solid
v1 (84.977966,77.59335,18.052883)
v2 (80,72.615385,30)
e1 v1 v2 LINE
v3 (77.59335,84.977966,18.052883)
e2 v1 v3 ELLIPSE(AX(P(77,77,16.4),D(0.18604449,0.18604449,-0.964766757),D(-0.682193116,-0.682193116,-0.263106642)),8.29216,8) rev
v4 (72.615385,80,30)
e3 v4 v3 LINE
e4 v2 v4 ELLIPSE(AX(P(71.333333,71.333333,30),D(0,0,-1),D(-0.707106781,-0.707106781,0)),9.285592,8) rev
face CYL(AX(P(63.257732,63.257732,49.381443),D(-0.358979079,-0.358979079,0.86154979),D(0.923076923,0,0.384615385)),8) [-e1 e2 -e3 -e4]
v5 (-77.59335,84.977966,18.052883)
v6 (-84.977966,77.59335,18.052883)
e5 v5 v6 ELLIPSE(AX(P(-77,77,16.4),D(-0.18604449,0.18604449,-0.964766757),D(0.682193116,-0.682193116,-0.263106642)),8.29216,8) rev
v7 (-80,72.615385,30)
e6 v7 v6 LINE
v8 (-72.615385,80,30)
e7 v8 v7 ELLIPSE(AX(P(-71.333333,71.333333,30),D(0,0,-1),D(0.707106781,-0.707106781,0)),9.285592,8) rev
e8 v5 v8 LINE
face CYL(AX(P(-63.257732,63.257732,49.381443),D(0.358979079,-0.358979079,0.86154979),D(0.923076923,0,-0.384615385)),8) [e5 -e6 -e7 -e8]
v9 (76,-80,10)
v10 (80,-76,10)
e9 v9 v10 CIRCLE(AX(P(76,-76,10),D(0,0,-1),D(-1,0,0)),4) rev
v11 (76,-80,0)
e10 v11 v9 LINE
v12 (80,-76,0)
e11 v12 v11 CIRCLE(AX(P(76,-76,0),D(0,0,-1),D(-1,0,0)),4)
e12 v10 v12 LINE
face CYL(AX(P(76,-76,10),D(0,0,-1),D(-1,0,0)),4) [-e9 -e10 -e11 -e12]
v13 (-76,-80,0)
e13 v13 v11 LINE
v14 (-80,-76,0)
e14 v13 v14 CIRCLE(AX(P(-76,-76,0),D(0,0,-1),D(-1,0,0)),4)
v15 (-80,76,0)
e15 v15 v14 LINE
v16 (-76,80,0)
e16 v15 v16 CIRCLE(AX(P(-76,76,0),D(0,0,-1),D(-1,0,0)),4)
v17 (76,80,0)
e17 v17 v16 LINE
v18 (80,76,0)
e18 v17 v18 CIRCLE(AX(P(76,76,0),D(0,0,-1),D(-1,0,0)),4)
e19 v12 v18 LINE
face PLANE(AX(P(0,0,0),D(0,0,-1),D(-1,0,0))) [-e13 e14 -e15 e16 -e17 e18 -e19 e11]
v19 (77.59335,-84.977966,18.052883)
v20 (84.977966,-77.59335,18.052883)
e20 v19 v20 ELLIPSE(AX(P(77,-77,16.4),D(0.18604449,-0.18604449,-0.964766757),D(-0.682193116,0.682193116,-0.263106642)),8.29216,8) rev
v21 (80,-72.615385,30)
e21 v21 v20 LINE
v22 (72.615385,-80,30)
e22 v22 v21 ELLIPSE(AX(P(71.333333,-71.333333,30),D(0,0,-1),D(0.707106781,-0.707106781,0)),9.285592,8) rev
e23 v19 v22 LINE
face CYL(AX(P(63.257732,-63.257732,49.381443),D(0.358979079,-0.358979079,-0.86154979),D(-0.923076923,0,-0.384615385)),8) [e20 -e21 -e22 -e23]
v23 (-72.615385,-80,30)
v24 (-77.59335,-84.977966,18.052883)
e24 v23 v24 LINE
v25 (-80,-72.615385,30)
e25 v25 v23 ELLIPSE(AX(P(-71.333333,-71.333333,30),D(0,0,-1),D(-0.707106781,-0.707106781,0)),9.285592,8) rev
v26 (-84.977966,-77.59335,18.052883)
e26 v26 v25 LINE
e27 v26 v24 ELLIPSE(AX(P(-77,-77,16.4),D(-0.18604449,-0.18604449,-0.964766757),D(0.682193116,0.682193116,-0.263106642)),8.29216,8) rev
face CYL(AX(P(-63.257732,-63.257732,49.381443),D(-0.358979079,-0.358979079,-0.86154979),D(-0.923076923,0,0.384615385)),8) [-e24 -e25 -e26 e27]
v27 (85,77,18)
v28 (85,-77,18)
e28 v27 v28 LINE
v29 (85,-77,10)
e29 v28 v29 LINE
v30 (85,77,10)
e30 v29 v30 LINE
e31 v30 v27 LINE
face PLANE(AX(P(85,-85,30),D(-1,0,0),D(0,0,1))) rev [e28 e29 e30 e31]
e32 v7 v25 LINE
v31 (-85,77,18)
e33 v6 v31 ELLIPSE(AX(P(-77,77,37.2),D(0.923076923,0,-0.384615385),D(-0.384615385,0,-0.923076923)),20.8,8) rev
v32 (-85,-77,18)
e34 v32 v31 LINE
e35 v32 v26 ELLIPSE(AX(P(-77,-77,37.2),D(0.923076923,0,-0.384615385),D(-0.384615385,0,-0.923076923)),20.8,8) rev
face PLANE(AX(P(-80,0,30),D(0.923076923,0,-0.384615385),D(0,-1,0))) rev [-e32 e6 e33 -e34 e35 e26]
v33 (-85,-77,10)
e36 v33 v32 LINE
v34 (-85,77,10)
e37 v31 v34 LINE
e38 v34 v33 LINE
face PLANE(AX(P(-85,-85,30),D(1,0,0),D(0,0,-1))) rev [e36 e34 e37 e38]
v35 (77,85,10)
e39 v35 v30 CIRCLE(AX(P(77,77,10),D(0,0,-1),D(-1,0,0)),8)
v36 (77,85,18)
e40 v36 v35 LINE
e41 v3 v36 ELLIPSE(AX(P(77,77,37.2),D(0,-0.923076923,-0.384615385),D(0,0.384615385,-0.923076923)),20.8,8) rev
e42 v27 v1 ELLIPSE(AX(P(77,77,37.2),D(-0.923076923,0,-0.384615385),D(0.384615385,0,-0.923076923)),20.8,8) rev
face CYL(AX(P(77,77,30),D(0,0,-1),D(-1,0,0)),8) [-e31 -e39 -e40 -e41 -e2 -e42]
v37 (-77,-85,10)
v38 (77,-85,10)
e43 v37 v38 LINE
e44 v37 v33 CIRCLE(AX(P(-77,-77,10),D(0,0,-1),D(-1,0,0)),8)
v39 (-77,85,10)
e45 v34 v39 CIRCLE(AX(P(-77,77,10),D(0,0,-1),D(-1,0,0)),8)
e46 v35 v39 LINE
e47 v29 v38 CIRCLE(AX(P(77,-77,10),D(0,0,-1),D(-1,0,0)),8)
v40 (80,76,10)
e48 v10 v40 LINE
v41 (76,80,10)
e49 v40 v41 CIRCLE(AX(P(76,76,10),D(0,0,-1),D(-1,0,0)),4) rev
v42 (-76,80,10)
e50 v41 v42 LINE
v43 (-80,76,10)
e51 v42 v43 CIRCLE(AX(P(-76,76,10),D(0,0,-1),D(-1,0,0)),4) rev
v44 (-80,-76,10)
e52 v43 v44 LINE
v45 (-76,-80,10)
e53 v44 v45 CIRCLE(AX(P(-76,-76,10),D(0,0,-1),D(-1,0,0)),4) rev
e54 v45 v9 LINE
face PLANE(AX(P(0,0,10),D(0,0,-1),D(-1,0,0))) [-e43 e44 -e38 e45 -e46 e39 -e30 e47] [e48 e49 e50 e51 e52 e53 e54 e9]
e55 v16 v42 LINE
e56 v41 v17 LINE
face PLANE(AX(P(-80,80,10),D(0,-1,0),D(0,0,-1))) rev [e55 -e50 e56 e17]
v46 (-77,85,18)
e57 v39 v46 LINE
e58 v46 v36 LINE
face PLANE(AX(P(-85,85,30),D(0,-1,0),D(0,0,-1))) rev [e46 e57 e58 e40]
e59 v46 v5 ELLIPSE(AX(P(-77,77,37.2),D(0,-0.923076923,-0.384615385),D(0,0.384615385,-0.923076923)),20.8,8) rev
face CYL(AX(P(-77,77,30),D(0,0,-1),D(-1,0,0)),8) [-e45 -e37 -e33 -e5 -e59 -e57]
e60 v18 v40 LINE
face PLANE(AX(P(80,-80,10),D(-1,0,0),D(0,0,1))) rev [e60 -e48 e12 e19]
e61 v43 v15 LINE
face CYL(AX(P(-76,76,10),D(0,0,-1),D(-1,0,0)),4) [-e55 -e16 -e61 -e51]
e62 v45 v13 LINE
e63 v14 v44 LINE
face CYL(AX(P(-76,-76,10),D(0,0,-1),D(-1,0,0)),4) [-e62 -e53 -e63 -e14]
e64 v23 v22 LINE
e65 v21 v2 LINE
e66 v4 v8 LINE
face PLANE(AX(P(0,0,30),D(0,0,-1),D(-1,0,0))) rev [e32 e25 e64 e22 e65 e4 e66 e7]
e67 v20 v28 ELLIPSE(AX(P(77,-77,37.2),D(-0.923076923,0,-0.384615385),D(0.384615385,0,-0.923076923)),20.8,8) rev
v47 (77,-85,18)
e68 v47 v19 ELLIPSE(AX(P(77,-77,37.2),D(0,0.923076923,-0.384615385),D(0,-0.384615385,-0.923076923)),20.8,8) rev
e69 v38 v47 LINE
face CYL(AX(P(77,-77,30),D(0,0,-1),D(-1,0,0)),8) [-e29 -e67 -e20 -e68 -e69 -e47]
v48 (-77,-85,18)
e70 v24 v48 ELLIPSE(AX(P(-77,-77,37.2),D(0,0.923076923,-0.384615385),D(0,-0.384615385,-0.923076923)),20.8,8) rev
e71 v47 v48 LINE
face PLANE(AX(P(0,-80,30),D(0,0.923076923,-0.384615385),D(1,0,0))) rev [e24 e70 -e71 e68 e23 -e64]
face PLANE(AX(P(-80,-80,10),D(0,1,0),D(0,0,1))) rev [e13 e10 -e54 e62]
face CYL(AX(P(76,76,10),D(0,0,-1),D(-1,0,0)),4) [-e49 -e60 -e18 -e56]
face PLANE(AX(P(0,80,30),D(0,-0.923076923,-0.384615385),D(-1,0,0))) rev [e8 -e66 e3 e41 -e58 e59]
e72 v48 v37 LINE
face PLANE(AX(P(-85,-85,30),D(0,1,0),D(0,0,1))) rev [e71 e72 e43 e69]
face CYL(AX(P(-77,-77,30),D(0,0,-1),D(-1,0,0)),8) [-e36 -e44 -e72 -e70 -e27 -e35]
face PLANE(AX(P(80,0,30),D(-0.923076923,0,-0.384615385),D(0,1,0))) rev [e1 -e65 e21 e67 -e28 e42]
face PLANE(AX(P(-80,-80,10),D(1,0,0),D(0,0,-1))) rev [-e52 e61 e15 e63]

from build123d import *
from OCP.BRepFilletAPI import BRepFilletAPI_MakeChamfer

# Parameters (mm, degrees)
SKIZZE1_W                       = 160
SKIZZE1_H                       = 160
AUFSATZ_LINEAR_AUSTRAGEN1_DEPTH = 10
SKIZZE2_W                       = 170
SKIZZE2_H                       = 170
AUFSATZ_LINEAR_AUSTRAGEN2_DEPTH = 20
FASE1_SIZE                      = 12
FASE1_SIZE2                     = 5
VERRUNDUNG1_R                   = 8
VERRUNDUNG2_R                   = 4


with BuildPart() as part:
    # Skizze1 → Aufsatz-Linear austragen1 (new body)
    with BuildSketch(Plane.XY):
        Rectangle(SKIZZE1_W, SKIZZE1_H)
    extrude(amount=AUFSATZ_LINEAR_AUSTRAGEN1_DEPTH)

    # Skizze2 → Aufsatz-Linear austragen2 (add)
    with BuildSketch(Plane.XY.offset(10)):
        Rectangle(SKIZZE2_W, SKIZZE2_H)
    extrude(amount=AUFSATZ_LINEAR_AUSTRAGEN2_DEPTH)

    # Fase1: one chamfer whose edges measure the first distance from different faces: ONE call of the kernel's chamfer builder (chamfer() names one face for all edges)
    fase1_edges_1 = [part.edges().sort_by_distance(p)[0] for p in [
        (85, 0, 30),
    ]]
    fase1_side_1 = [part.faces().sort_by_distance(p)[0] for p in [
        (85, 0, 20),
    ]]
    fase1_edges_2 = [part.edges().sort_by_distance(p)[0] for p in [
        (0, 85, 30),
    ]]
    fase1_side_2 = [part.faces().sort_by_distance(p)[0] for p in [
        (0, 85, 20),
    ]]
    fase1_edges_3 = [part.edges().sort_by_distance(p)[0] for p in [
        (-85, 0, 30),
    ]]
    fase1_side_3 = [part.faces().sort_by_distance(p)[0] for p in [
        (-85, 0, 20),
    ]]
    fase1_edges_4 = [part.edges().sort_by_distance(p)[0] for p in [
        (0, -85, 30),
    ]]
    fase1_side_4 = [part.faces().sort_by_distance(p)[0] for p in [
        (0, -85, 20),
    ]]
    fase1 = BRepFilletAPI_MakeChamfer(part.part.solid().wrapped)
    for e in fase1_edges_1:
        fase1.Add(FASE1_SIZE, FASE1_SIZE2, e.wrapped, fase1_side_1[0].wrapped)  # the first distance lies on this face
    for e in fase1_edges_2:
        fase1.Add(FASE1_SIZE, FASE1_SIZE2, e.wrapped, fase1_side_2[0].wrapped)  # the first distance lies on this face
    for e in fase1_edges_3:
        fase1.Add(FASE1_SIZE, FASE1_SIZE2, e.wrapped, fase1_side_3[0].wrapped)  # the first distance lies on this face
    for e in fase1_edges_4:
        fase1.Add(FASE1_SIZE, FASE1_SIZE2, e.wrapped, fase1_side_4[0].wrapped)  # the first distance lies on this face
    add(Compound.cast(fase1.Shape()), mode=Mode.REPLACE)

    # Verrundung1
    # the kernel refuses this fillet: 8 mm, written as the material it takes off along each edge
    with BuildSketch(Plane(origin=(85, 85, -10), x_dir=(0, -1, 0), z_dir=(0, 0, 1)), Plane(origin=(85, -85, -10), x_dir=(-1, 0, 0), z_dir=(0, 0, 1))) as verrundung1_piece_1:
        with BuildLine():
            CenterArc((VERRUNDUNG1_R, -VERRUNDUNG1_R), VERRUNDUNG1_R, 90, 90)
            Line((0, -VERRUNDUNG1_R), (0, 0))
            Line((0, 0), (VERRUNDUNG1_R, 0))
        make_face()
    extrude(amount=48, mode=Mode.SUBTRACT)
    with BuildSketch(Plane(origin=(-85, -85, -10), x_dir=(1, 0, 0), z_dir=(0, 0, 1)), Plane(origin=(-85, 85, -10), x_dir=(0, -1, 0), z_dir=(0, 0, 1))) as verrundung1_piece_2:
        with BuildLine():
            CenterArc((VERRUNDUNG1_R, VERRUNDUNG1_R), VERRUNDUNG1_R, 180, 90)
            Line((0, VERRUNDUNG1_R), (0, 0))
            Line((0, 0), (VERRUNDUNG1_R, 0))
        make_face()
    extrude(amount=48, mode=Mode.SUBTRACT)
    with BuildSketch(Plane(origin=(-91.18556701, -91.18556701, 3.154639175), x_dir=(0.9333456062030596, -0.13806887665725864, -0.331365303977417), z_dir=(0.358979079308869, 0.35897907930886913, 0.8615497903412858)), Plane(origin=(-91.18556701, 91.18556701, 3.154639175), x_dir=(-0.13806887665725653, -0.9333456062030596, -0.3313653039774179), z_dir=(0.35897907930886913, -0.358979079308869, 0.8615497903412858))) as verrundung1_piece_3:
        with BuildLine():
            CenterArc((VERRUNDUNG1_R * 0.861549790341, VERRUNDUNG1_R), VERRUNDUNG1_R, 188.506927756, 81.493072244)
            Line((-VERRUNDUNG1_R * 0.127448193837, VERRUNDUNG1_R * 0.852071005917), (0, 0))
            Line((0, 0), (VERRUNDUNG1_R * 0.861549790341, 0))
        make_face()
    extrude(amount=48.390379891, mode=Mode.SUBTRACT)
    with BuildSketch(Plane(origin=(91.18556701, -91.18556701, 3.154639175), x_dir=(-0.9333456062030596, -0.13806887665725678, -0.331365303977418), z_dir=(-0.35897907930886913, 0.358979079308869, 0.8615497903412858)), Plane(origin=(91.18556701, 91.18556701, 3.154639175), x_dir=(0.13806887665725714, -0.9333456062030596, -0.33136530397741776), z_dir=(-0.358979079308869, -0.35897907930886913, 0.8615497903412858))) as verrundung1_piece_4:
        with BuildLine():
            CenterArc((VERRUNDUNG1_R * 0.861549790341, -VERRUNDUNG1_R), VERRUNDUNG1_R, 90, 81.493072244)
            Line((-VERRUNDUNG1_R * 0.127448193837, -VERRUNDUNG1_R * 0.852071005917), (0, 0))
            Line((0, 0), (VERRUNDUNG1_R * 0.861549790341, 0))
        make_face()
    extrude(amount=48.390379891, mode=Mode.SUBTRACT)

    # Verrundung2
    verrundung2_edges = [part.edges().sort_by_distance(p)[0] for p in [
        (80, -80, 5),
        (-80, -80, 5),
        (-80, 80, 5),
        (80, 80, 5),
    ]]
    fillet(verrundung2_edges, radius=VERRUNDUNG2_R)


solid = part.part
